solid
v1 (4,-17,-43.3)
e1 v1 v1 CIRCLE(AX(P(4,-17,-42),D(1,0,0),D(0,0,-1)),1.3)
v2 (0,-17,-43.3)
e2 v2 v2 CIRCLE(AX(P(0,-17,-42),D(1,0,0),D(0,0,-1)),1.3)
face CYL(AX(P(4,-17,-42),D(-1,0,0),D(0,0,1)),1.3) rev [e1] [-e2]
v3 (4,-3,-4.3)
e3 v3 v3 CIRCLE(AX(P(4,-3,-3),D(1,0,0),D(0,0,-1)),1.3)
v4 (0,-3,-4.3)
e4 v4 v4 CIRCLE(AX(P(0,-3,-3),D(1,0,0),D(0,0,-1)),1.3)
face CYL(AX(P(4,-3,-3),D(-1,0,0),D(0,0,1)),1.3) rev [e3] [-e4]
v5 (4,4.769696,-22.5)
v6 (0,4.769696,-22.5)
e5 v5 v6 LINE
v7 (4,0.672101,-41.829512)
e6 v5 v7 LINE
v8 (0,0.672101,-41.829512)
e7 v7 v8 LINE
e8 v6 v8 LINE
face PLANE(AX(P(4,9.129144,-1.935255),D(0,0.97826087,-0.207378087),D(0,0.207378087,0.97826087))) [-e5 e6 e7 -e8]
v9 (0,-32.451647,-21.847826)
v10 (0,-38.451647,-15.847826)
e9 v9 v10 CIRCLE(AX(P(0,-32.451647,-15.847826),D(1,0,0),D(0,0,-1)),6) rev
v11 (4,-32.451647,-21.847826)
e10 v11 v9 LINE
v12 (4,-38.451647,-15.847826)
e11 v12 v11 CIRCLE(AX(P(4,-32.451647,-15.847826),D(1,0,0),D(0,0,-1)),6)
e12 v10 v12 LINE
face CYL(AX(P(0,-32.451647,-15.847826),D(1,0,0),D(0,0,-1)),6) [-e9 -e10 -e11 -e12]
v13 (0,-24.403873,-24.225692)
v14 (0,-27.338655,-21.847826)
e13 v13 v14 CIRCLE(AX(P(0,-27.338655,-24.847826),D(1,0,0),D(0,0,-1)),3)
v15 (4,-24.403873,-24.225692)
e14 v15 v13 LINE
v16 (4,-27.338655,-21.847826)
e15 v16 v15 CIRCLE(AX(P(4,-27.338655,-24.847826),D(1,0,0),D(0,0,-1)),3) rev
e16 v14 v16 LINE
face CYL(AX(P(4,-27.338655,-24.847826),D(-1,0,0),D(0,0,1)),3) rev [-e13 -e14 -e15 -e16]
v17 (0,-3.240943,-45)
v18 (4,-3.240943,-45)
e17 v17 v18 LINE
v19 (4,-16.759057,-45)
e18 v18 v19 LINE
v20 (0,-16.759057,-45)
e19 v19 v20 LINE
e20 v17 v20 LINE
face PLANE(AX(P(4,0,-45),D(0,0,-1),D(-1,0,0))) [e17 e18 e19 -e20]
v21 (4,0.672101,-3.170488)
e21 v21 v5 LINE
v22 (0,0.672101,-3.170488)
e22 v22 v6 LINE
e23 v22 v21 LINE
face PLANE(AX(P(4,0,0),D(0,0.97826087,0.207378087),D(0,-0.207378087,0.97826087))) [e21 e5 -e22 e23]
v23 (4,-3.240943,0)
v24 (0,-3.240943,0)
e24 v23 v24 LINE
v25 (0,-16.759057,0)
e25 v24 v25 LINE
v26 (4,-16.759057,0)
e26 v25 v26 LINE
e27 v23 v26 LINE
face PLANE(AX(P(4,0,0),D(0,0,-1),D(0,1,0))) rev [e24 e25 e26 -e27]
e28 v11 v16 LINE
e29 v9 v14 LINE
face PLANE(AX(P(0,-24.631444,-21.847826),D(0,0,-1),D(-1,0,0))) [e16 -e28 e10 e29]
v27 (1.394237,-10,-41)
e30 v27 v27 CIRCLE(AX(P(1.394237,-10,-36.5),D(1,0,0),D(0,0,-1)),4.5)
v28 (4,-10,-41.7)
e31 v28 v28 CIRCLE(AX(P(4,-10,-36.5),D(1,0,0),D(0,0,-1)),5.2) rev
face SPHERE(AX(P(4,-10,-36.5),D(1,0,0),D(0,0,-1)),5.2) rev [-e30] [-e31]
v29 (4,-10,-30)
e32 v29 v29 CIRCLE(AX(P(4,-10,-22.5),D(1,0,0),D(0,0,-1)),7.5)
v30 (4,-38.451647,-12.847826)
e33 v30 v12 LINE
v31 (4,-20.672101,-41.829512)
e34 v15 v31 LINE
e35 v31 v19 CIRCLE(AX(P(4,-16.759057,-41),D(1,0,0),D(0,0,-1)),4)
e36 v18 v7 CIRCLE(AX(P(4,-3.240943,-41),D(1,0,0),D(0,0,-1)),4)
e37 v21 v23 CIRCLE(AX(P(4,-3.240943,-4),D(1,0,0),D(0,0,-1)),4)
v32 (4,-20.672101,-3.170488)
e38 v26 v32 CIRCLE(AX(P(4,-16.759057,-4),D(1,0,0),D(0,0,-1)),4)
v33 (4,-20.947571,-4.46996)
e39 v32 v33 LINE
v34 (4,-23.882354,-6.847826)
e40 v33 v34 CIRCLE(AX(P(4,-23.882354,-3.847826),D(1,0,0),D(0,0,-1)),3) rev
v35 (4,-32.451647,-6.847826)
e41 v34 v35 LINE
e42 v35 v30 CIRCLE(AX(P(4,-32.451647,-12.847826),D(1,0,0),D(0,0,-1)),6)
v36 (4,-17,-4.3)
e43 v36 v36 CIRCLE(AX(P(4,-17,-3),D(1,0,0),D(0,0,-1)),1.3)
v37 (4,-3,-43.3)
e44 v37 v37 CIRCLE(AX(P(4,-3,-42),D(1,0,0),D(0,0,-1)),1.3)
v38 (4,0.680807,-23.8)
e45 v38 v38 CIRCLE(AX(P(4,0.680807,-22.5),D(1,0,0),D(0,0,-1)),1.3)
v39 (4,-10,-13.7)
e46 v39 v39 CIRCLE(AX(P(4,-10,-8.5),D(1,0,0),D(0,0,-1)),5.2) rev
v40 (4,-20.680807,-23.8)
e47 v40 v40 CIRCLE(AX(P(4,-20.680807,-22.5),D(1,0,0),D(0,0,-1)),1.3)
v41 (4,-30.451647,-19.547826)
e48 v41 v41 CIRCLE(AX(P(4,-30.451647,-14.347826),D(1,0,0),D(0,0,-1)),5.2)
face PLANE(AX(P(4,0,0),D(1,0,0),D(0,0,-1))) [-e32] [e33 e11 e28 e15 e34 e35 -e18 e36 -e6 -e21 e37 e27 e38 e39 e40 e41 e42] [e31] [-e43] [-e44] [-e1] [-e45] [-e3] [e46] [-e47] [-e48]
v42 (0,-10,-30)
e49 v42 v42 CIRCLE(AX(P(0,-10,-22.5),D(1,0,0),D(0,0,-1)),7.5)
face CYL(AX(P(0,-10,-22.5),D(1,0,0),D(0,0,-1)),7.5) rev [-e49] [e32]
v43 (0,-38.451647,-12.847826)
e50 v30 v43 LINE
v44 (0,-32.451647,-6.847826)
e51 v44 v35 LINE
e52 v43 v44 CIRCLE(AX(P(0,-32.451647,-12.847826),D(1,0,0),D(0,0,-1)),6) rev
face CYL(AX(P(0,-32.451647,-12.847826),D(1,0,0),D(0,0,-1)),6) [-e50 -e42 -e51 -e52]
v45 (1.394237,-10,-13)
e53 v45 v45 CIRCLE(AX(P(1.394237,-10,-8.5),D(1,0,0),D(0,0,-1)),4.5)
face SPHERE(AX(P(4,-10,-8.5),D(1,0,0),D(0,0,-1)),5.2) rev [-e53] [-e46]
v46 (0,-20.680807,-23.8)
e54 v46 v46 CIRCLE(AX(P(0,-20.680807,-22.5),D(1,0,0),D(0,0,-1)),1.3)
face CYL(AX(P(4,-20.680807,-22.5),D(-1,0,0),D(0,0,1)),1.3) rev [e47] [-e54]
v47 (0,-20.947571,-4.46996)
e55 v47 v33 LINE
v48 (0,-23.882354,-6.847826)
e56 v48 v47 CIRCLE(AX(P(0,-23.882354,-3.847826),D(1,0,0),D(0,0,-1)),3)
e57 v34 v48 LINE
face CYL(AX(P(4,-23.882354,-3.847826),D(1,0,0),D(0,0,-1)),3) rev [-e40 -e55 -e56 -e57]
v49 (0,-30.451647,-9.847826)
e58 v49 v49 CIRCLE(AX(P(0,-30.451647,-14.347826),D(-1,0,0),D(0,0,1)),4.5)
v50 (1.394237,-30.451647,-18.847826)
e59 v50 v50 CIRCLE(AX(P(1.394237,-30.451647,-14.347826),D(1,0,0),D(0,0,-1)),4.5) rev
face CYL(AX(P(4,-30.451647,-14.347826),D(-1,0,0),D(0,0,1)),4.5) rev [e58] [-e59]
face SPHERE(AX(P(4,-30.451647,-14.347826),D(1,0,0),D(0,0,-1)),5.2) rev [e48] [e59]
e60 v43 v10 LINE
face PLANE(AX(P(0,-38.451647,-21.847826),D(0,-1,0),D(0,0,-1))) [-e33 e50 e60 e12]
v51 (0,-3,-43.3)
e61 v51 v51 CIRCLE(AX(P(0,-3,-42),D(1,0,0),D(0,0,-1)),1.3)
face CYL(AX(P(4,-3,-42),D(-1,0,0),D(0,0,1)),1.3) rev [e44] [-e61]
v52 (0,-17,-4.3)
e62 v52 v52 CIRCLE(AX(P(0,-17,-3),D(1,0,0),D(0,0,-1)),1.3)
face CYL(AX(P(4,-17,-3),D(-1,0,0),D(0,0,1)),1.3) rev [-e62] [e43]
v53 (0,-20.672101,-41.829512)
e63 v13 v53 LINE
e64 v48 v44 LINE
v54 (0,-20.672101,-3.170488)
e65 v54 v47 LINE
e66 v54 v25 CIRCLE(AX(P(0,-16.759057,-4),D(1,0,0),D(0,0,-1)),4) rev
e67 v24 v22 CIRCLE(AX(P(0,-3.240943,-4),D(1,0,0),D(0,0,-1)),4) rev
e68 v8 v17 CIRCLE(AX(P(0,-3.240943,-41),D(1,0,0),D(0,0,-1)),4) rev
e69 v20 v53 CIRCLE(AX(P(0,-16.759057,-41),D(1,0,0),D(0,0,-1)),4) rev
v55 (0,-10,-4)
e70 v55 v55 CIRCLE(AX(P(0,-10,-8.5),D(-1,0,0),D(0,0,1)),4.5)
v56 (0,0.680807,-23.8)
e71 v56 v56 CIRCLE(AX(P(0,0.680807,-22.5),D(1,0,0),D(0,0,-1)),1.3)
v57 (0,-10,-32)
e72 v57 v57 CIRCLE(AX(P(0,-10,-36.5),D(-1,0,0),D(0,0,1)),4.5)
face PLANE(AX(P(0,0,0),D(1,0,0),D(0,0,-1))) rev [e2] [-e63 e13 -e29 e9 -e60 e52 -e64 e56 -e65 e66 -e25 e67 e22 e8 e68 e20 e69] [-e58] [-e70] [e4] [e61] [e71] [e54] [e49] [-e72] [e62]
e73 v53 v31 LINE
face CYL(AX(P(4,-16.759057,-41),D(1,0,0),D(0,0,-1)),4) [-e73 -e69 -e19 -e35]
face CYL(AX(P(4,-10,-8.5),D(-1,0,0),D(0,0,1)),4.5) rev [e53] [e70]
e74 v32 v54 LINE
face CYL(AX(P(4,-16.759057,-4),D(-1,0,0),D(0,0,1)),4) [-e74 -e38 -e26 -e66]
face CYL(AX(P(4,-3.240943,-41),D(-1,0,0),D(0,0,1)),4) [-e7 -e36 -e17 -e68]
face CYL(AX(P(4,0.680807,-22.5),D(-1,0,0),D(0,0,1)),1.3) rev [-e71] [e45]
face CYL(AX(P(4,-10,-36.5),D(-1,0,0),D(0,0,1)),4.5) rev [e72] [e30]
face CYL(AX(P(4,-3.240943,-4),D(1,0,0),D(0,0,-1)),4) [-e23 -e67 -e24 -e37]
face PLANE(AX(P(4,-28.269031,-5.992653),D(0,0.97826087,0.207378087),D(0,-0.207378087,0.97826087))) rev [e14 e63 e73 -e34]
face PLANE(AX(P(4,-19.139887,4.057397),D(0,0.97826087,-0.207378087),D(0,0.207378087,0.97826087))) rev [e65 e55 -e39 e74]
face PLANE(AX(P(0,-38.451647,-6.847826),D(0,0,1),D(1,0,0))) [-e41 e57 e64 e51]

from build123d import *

# Parameters (mm, degrees)
SKETCH1_R           = 1.3
BOSS_EXTRUDE1_DEPTH = 4
SKETCH3_R           = 7.5
CUT_EXTRUDE1_DEPTH  = 52.522207254
SKETCH4_R           = 4.5
CUT_EXTRUDE2_DEPTH  = 52.522207254
BOSS_EXTRUDE2_DEPTH = 4
SKETCH7_R           = 4.5
CUT_EXTRUDE3_DEPTH  = 60.325619484
FILLET1_R           = 6
FILLET2_R           = 4
FILLET3_R           = 3
FILLET4_R           = 3


with BuildPart() as part:
    # Sketch1 → Boss-Extrude1 (new body)
    with BuildSketch(Plane(origin=(0, 0, 0), x_dir=(0, 0, -1), z_dir=(1, 0, 0))):
        Polygon((0, 0), (22.5, 4.769696007), (45, 0), (45, -20), (22.5, -24.769696007), (0, -20), align=None)
        with Locations((22.5, 0.680807118)):
            Circle(SKETCH1_R, mode=Mode.SUBTRACT)
        with Locations((22.5, -20.680807118)):
            Circle(SKETCH1_R, mode=Mode.SUBTRACT)
        with Locations((3, -3)):
            Circle(SKETCH1_R, mode=Mode.SUBTRACT)
        with Locations((42, -3)):
            Circle(SKETCH1_R, mode=Mode.SUBTRACT)
        with Locations((42, -17)):
            Circle(SKETCH1_R, mode=Mode.SUBTRACT)
        with Locations((3, -17)):
            Circle(SKETCH1_R, mode=Mode.SUBTRACT)
    extrude(amount=BOSS_EXTRUDE1_DEPTH)

    # Sketch2 → Cut-Revolve1 (revolve, cut)
    with BuildSketch(Plane(origin=(4, 0, 0), x_dir=(0, 0, -1), z_dir=(1, 0, 0))):
        with BuildLine():
            Line((3.3, -10), (13.7, -10))
            ThreePointArc((13.7, -10), (8.5, -4.8), (3.3, -10))
        make_face()
        with BuildLine():
            Line((31.3, -10), (41.7, -10))
            ThreePointArc((41.7, -10), (36.5, -4.8), (31.3, -10))
        make_face()
    revolve(axis=Axis((4, -10, -3.3), (0, 0, -1)), mode=Mode.SUBTRACT)

    # Sketch3 → Cut-Extrude1 (cut, through all)
    with BuildSketch(Plane(origin=(4, 0, 0), x_dir=(0, 0, -1), z_dir=(1, 0, 0))):
        with Locations((22.5, -10)):
            Circle(SKETCH3_R)
    extrude(amount=-CUT_EXTRUDE1_DEPTH, mode=Mode.SUBTRACT)

    # Sketch4 → Cut-Extrude2 (cut, through all)
    with BuildSketch(Plane.ZY):
        with Locations((-8.5, -10)):
            Circle(SKETCH4_R)
        with Locations((-36.5, -10)):
            Circle(SKETCH4_R)
    extrude(amount=-CUT_EXTRUDE2_DEPTH, mode=Mode.SUBTRACT)

    # Sketch5 → Boss-Extrude2 (add)
    with BuildSketch(Plane(origin=(4, 0, 0), x_dir=(0, 0, -1), z_dir=(1, 0, 0))):
        Polygon((6.847826087, -21.451646611), (21.847826087, -24.631443949), (21.847826087, -38.451646611), (6.847826087, -38.451646611), align=None)
    extrude(amount=-BOSS_EXTRUDE2_DEPTH)

    # Sketch6 → Cut-Revolve2 (revolve, cut)
    with BuildSketch(Plane(origin=(4, 0, 0), x_dir=(0, 0, -1), z_dir=(1, 0, 0))):
        with BuildLine():
            Line((14.347826087, -25.251646611), (14.347826087, -35.651646611))
            ThreePointArc((14.347826087, -35.651646611), (9.147826087, -30.451646611), (14.347826087, -25.251646611))
        make_face()
    revolve(axis=Axis((4, -25.251646611, -14.347826087), (0, -1, 0)), mode=Mode.SUBTRACT)

    # Sketch7 → Cut-Extrude3 (cut, through all)
    with BuildSketch(Plane.ZY):
        with Locations((-14.347826087, -30.451646611)):
            Circle(SKETCH7_R)
    extrude(amount=-CUT_EXTRUDE3_DEPTH, mode=Mode.SUBTRACT)

    # Fillet1
    fillet1_edges = [part.edges().sort_by_distance(p)[0] for p in [
        (2, -38.451646611, -6.847826087),
        (2, -38.451646611, -21.847826087),
    ]]
    fillet(fillet1_edges, radius=FILLET1_R)

    # Fillet2
    fillet2_edges = [part.edges().sort_by_distance(p)[0] for p in [
        (2, -20, 0),
        (2, 0, 0),
        (2, 0, -45),
        (2, -20, -45),
    ]]
    fillet(fillet2_edges, radius=FILLET2_R)

    # Fillet3
    # the kernel refuses this fillet: 3 mm, written as the material it adds along each edge
    with BuildSketch(Plane(origin=(4, -21.451646611, -6.847826087), x_dir=(0, 0.20737808726455337, 0.9782608695652173), z_dir=(-1, 0, 0))) as fillet3_piece_1:
        with BuildLine():
            CenterArc((FILLET3_R * 0.810235733018, -FILLET3_R), FILLET3_R, 90, 78.031254445)
            Line((-FILLET3_R * 0.168025136547, -FILLET3_R * 0.792621912735), (-FILLET3_R * 0.187590353938, -FILLET3_R * 0.78847435099))
            Line((-FILLET3_R * 0.187590353938, -FILLET3_R * 0.78847435099), (-FILLET3_R * 0.0162047146604, FILLET3_R * 0.02))
            Line((-FILLET3_R * 0.0162047146604, FILLET3_R * 0.02), (FILLET3_R * 0.810235733018, FILLET3_R * 0.02))
            Line((FILLET3_R * 0.810235733018, FILLET3_R * 0.02), (FILLET3_R * 0.810235733018, 0))
        make_face()
    extrude(amount=4)
    with BuildSketch(Plane(origin=(4, -24.631443949, -21.847826087), x_dir=(0, -1, 0), z_dir=(-1, 0, 0))) as fillet3_piece_2:
        with BuildLine():
            CenterArc((2.005793936, -3), FILLET3_R, 90, 38.499950409)
            Line((0.138252058, -0.652173913), (0.100901221, -0.605217391))
            ThreePointArc((0.100901221, -0.605217391), (0.010430377, -0.338529642), (-0.058695652, -0.012442685))
            Line((-0.058695652, -0.012442685), (0, 0.06))
            Line((0, 0.06), (2.005793936, 0.06))
            Line((2.005793936, 0.06), (2.005793936, 0))
        make_face()
    extrude(amount=4)

    # Fillet4
    # the kernel refuses this fillet: 3 mm, written as the material it adds along each edge
    with BuildSketch(Plane(origin=(0, -24.769696007, -22.5), x_dir=(0, -0.9692541852770001, 0.24606162708357948), z_dir=(1, 0, 0))) as fillet4_piece_1:
        with BuildLine():
            CenterArc((1.912264605, 2.907762556), FILLET4_R, 206.213326816, 78.031254445)
            Line((-0.779202353, 1.582618935), (-1.048349049, 1.450104573))
            Line((-1.048349049, 1.450104573), (-0.269146696, -0.132514362))
            Line((-0.269146696, -0.132514362), (-0.123241287, -0.273517065))
            ThreePointArc((-0.123241287, -0.273517065), (2.044416244, -0.463368157), (2.724267974, -0.290776256))
            Line((2.724267974, -0.290776256), (2.650449486, 0))
        make_face()
    extrude(amount=4)


solid = part.part
